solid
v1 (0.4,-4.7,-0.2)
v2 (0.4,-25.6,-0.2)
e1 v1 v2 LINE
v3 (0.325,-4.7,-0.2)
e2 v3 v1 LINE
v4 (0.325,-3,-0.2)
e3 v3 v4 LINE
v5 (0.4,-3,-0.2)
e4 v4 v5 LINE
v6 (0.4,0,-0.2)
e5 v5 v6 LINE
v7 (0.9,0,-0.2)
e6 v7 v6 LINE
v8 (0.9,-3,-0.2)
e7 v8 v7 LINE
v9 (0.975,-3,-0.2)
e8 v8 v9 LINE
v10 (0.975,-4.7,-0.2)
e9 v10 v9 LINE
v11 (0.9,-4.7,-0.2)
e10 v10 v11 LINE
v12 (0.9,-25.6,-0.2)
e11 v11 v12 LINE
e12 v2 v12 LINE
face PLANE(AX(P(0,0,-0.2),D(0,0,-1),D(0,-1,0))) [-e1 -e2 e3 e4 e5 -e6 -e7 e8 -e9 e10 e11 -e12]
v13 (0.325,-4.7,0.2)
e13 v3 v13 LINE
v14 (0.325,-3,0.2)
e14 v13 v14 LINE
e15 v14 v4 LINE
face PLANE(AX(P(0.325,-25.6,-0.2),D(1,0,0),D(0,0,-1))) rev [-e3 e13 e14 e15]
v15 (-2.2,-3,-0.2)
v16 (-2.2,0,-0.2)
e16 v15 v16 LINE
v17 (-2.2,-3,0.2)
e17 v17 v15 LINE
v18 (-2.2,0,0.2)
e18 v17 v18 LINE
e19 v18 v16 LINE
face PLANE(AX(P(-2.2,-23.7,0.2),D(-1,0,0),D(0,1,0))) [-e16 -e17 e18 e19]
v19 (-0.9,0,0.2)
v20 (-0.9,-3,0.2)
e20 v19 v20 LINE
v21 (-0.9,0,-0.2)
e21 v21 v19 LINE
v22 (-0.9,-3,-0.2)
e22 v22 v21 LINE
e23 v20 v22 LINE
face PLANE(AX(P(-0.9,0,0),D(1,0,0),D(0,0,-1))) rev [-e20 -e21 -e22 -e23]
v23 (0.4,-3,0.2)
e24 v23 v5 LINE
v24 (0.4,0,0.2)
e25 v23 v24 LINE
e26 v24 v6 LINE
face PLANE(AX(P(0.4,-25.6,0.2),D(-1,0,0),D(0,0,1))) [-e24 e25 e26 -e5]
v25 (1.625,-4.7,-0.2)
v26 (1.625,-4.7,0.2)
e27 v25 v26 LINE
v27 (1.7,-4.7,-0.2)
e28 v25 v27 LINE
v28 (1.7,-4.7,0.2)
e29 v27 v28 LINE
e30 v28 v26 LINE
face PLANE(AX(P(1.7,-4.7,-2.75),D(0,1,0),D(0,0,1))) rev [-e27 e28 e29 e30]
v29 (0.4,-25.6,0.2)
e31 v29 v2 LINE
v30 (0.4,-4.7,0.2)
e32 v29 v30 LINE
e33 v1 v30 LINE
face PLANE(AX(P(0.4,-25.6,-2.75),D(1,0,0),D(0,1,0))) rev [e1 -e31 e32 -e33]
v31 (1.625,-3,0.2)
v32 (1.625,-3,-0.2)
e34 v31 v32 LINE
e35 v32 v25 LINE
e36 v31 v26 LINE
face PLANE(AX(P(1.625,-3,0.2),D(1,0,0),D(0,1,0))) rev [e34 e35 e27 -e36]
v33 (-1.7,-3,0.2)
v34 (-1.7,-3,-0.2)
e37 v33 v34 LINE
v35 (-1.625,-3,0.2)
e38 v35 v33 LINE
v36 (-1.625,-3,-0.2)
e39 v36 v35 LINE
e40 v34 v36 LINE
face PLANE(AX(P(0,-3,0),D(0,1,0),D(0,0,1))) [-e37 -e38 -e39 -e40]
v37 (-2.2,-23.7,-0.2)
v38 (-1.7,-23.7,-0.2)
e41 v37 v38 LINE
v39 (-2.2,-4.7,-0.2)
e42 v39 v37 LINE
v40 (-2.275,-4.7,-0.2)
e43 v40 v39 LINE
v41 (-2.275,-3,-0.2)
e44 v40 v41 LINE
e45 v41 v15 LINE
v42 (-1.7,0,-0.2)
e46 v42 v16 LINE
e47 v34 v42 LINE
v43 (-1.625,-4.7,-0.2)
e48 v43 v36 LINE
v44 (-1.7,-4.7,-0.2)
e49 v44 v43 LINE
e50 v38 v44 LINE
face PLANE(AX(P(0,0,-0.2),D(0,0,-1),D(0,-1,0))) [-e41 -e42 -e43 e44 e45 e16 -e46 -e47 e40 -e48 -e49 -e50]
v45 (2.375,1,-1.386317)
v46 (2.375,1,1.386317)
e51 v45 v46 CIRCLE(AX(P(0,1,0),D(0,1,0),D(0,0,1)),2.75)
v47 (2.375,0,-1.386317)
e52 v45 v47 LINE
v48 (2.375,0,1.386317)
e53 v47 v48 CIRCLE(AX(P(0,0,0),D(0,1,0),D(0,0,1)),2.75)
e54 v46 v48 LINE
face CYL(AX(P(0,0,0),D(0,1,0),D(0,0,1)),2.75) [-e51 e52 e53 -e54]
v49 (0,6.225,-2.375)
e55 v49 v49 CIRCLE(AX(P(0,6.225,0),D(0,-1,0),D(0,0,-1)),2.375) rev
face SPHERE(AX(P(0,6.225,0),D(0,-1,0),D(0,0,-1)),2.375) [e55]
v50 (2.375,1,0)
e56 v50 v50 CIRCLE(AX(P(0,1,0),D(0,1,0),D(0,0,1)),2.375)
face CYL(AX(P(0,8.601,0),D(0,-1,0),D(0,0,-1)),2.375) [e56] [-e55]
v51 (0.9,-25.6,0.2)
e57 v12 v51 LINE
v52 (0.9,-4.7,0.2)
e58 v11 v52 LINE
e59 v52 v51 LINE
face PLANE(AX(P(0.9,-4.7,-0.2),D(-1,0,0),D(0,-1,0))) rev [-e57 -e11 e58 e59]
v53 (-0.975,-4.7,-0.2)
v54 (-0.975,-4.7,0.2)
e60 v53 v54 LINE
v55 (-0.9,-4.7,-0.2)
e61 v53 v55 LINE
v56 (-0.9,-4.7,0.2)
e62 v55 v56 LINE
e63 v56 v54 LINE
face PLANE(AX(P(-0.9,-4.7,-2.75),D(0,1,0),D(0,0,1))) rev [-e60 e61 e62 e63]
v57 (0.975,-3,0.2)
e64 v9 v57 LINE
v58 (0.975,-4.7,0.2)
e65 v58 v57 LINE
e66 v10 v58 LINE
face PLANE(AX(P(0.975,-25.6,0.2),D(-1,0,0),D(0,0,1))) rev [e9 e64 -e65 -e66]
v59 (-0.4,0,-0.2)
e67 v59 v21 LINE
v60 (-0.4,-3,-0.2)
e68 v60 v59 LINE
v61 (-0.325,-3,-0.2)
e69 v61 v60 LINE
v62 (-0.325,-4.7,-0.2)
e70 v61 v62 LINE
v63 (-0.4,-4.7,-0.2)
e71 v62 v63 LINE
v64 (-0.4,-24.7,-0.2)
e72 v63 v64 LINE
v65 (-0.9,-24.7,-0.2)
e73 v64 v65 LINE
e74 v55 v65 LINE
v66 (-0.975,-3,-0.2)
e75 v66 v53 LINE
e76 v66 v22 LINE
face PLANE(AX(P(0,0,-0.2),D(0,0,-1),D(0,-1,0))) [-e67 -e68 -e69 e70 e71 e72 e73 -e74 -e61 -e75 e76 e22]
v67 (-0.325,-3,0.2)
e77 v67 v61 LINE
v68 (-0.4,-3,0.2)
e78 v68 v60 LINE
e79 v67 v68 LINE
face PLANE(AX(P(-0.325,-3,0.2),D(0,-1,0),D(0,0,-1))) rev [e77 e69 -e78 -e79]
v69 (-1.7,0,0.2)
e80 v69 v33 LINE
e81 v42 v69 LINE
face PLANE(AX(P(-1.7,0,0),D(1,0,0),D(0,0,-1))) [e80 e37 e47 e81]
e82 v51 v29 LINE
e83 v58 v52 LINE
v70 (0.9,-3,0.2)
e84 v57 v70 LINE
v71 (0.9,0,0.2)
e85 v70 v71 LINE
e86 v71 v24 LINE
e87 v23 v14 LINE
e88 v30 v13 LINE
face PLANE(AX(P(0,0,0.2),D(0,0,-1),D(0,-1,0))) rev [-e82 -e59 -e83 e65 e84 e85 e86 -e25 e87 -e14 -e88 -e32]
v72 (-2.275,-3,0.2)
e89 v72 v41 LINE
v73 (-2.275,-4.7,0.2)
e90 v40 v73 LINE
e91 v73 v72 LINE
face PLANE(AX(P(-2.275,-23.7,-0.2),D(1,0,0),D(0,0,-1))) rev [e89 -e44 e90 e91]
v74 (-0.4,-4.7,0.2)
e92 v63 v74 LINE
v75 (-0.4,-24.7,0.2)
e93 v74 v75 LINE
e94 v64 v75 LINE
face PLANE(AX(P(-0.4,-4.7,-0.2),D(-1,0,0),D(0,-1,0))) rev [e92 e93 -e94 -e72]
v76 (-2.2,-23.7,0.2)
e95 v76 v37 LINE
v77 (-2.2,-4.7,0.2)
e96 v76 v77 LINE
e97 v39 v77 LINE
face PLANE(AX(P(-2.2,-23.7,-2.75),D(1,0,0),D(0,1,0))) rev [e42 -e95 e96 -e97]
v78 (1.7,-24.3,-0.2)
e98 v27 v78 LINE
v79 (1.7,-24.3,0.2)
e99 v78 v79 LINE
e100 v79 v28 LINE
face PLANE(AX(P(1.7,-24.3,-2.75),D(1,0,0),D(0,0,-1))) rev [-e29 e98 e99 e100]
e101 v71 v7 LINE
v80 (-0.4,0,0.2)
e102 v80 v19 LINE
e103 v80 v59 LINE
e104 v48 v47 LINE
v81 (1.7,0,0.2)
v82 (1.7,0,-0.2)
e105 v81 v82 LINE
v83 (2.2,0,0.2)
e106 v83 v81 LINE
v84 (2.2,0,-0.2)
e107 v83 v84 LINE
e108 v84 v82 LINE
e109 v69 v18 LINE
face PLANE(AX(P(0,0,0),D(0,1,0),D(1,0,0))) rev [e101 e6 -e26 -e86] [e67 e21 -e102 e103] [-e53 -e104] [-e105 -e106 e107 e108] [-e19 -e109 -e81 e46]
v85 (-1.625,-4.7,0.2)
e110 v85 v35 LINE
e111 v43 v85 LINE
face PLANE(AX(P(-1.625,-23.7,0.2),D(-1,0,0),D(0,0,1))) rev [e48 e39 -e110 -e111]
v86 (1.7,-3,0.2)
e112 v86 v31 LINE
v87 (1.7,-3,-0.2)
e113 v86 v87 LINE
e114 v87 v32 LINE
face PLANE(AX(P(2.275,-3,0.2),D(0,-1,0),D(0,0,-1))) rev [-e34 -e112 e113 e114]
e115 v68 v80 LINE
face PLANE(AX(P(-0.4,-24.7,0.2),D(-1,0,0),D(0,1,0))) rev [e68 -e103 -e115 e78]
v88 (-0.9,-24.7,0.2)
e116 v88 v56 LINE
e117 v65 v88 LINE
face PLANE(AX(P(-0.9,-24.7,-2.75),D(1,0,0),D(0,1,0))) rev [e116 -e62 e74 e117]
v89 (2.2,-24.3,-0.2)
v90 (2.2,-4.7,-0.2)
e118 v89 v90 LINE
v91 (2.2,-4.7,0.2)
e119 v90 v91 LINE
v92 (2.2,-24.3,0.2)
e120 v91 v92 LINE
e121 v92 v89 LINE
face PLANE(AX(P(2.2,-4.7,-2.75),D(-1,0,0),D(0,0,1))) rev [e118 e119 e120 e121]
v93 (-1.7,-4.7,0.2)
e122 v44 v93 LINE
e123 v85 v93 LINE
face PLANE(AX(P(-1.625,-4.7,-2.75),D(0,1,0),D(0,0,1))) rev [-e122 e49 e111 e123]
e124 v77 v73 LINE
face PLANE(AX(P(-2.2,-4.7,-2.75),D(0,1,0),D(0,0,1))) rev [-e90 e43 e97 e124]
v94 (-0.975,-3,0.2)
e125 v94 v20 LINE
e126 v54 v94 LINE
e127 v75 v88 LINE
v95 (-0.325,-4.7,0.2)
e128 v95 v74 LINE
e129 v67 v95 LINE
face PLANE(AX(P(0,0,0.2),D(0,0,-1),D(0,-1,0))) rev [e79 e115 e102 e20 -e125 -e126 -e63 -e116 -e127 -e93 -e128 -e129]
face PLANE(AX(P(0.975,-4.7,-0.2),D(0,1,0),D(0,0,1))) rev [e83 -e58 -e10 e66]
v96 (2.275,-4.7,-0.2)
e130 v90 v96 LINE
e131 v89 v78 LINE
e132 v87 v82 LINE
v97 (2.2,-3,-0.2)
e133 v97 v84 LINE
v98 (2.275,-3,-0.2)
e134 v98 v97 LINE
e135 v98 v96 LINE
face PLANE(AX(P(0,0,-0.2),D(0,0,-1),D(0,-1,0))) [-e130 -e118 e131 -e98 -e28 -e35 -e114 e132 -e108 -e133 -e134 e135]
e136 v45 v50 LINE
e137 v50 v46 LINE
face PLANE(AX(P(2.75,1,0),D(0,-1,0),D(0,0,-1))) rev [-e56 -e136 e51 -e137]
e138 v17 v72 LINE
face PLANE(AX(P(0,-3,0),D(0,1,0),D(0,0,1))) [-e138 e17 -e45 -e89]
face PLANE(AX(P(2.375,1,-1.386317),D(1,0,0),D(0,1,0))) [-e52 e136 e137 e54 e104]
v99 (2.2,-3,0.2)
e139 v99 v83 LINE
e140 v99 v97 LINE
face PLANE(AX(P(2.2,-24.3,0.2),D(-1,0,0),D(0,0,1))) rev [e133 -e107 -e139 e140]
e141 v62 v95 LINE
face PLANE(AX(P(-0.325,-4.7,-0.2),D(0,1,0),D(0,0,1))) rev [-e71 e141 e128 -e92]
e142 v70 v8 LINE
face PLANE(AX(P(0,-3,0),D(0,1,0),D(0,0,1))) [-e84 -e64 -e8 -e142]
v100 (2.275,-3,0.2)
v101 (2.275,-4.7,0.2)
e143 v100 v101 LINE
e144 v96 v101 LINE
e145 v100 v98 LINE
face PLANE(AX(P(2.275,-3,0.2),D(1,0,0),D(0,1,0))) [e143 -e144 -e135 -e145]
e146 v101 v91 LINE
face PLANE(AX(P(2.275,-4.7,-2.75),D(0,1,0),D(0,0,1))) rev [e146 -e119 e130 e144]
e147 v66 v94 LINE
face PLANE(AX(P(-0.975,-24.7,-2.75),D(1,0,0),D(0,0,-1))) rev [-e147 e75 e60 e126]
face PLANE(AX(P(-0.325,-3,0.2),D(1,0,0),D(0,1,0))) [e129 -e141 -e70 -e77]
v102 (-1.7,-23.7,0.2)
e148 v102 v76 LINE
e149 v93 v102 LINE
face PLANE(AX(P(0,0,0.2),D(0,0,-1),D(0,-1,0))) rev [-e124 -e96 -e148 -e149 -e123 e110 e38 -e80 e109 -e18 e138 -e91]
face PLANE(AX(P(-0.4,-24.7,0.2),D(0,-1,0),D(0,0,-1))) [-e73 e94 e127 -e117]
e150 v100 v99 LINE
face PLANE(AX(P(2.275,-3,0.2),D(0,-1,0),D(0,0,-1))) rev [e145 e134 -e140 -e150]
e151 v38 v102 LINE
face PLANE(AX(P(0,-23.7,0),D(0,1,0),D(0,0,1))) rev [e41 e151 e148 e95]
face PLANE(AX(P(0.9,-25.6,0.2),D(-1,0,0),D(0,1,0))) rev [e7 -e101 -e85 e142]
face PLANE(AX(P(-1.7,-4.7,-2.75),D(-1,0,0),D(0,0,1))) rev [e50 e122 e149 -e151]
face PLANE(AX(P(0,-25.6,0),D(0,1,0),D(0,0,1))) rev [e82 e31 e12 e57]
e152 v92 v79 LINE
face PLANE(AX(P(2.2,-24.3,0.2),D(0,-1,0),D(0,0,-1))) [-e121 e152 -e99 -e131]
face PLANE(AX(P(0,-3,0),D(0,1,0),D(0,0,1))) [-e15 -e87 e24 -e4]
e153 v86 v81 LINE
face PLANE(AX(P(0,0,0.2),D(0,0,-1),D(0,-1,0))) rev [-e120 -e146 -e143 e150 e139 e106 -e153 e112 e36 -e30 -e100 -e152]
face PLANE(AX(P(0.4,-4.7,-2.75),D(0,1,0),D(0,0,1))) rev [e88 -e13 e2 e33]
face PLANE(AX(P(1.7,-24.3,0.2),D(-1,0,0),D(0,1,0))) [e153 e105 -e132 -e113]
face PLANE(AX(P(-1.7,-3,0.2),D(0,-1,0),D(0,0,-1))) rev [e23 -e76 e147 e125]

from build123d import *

# Parameters (mm, degrees)
BOSS_EXTRUDE1_START         = -4
BOSS_EXTRUDE1_OUTLINE_W     = 0.5
BOSS_EXTRUDE1_OUTLINE_H     = 0.4
BOSS_EXTRUDE1_OUTLINE_W_2   = 1.8
BOSS_EXTRUDE1_DEPTH         = 25.3
BOSS_EXTRUDE1_2_OUTLINE_W   = 0.5
BOSS_EXTRUDE1_2_OUTLINE_H   = 0.4
BOSS_EXTRUDE1_2_OUTLINE_W_2 = 1.8
BOSS_EXTRUDE1_2_DEPTH       = 1
BOSS_EXTRUDE1_3_OUTLINE_W   = 0.075
BOSS_EXTRUDE1_3_OUTLINE_H   = 0.4
BOSS_EXTRUDE1_3_DEPTH       = 21.3
BOSS_EXTRUDE1_START_2       = 21.3
BOSS_EXTRUDE1_4_OUTLINE_W   = 0.65
BOSS_EXTRUDE1_4_OUTLINE_H   = 0.4
BOSS_EXTRUDE1_4_OUTLINE_W_2 = 1.875
BOSS_EXTRUDE1_4_DEPTH       = 0.4
BOSS_EXTRUDE1_START_3       = 21.7
BOSS_EXTRUDE1_5_OUTLINE_W   = 0.65
BOSS_EXTRUDE1_5_OUTLINE_H   = 0.4
BOSS_EXTRUDE1_5_DEPTH       = 0.9
SKETCH2_W                   = 1.225
SKETCH2_H                   = 21.7
CUT_EXTRUDE1_DEPTH          = 26.915728815
SKETCH6_W                   = 0.4
SKETCH6_H                   = 3
CUT_EXTRUDE2_DEPTH          = 0.8
SKETCH11_W                  = 0.65
SKETCH11_H                  = 0.4
BOSS_EXTRUDE2_DEPTH         = 20.7
SKETCH17_W                  = 0.075
SKETCH17_H                  = 20
CUT_EXTRUDE3_DEPTH          = 0.4
SKETCH18_W                  = 0.075
SKETCH18_H                  = 20
CUT_EXTRUDE4_DEPTH          = 26.915728815
SKETCH19_W                  = 0.075
SKETCH19_H                  = 19.6
CUT_EXTRUDE5_DEPTH          = 26.915728815
SKETCH20_W                  = 0.075
SKETCH20_H                  = 19.6
CUT_EXTRUDE6_DEPTH          = 26.915728815
SKETCH21_W                  = 0.075
SKETCH21_H                  = 20.9
CUT_EXTRUDE7_DEPTH          = 0.4
SKETCH22_W                  = 0.075
SKETCH22_H                  = 20.9
CUT_EXTRUDE8_DEPTH          = 26.915728815
SKETCH23_W                  = 0.075
SKETCH23_H                  = 19
CUT_EXTRUDE9_DEPTH          = 26.915728815
SKETCH24_W                  = 0.075
SKETCH24_H                  = 19
CUT_EXTRUDE10_DEPTH         = 26.915728815


with BuildPart() as part:
    # Boss-Extrude1: read off the stored shape, not the designer's step
    # Boss-Extrude1 outline → Boss-Extrude1 (new body)
    with BuildSketch(Plane.XZ.offset(3).offset(BOSS_EXTRUDE1_START)):
        with Locations((0.65, 0)):
            Rectangle(BOSS_EXTRUDE1_OUTLINE_W, BOSS_EXTRUDE1_OUTLINE_H)
        with Locations((-1.3, 0)):
            Rectangle(BOSS_EXTRUDE1_OUTLINE_W_2, BOSS_EXTRUDE1_OUTLINE_H)
        with Locations((1.95, 0)):
            Rectangle(BOSS_EXTRUDE1_OUTLINE_W, BOSS_EXTRUDE1_OUTLINE_H)
    extrude(amount=BOSS_EXTRUDE1_DEPTH)

    # Boss-Extrude1 2 outline → Boss-Extrude1 2 (add)
    with BuildSketch(Plane.XZ.offset(3).offset(BOSS_EXTRUDE1_START)):
        with BuildLine():
            ThreePointArc((2.375, 1.386317063), (-2.75, 0), (2.375, -1.386317063))
            Line((2.375, -1.386317063), (2.375, 1.386317063))
        make_face()
        with Locations((0.65, 0)):
            Rectangle(BOSS_EXTRUDE1_2_OUTLINE_W, BOSS_EXTRUDE1_2_OUTLINE_H, mode=Mode.SUBTRACT)
        with Locations((-1.3, 0)):
            Rectangle(BOSS_EXTRUDE1_2_OUTLINE_W_2, BOSS_EXTRUDE1_2_OUTLINE_H, mode=Mode.SUBTRACT)
        with Locations((1.95, 0)):
            Rectangle(BOSS_EXTRUDE1_2_OUTLINE_W, BOSS_EXTRUDE1_2_OUTLINE_H, mode=Mode.SUBTRACT)
    extrude(amount=BOSS_EXTRUDE1_2_DEPTH)

    # Boss-Extrude1 3 outline → Boss-Extrude1 3 (add)
    with BuildSketch(Plane.XZ.offset(3)):
        with Locations((0.3625, 0)):
            Rectangle(BOSS_EXTRUDE1_3_OUTLINE_W, BOSS_EXTRUDE1_3_OUTLINE_H)
        with Locations((0.9375, 0)):
            Rectangle(BOSS_EXTRUDE1_3_OUTLINE_W, BOSS_EXTRUDE1_3_OUTLINE_H)
        with Locations((-0.3625, 0)):
            Rectangle(BOSS_EXTRUDE1_3_OUTLINE_W, BOSS_EXTRUDE1_3_OUTLINE_H)
        with Locations((1.6625, 0)):
            Rectangle(BOSS_EXTRUDE1_3_OUTLINE_W, BOSS_EXTRUDE1_3_OUTLINE_H)
        with Locations((2.2375, 0)):
            Rectangle(BOSS_EXTRUDE1_3_OUTLINE_W, BOSS_EXTRUDE1_3_OUTLINE_H)
    extrude(amount=BOSS_EXTRUDE1_3_DEPTH)

    # Boss-Extrude1 4 outline → Boss-Extrude1 4 (add)
    with BuildSketch(Plane.XZ.offset(3).offset(BOSS_EXTRUDE1_START_2)):
        with Locations((0.65, 0)):
            Rectangle(BOSS_EXTRUDE1_4_OUTLINE_W, BOSS_EXTRUDE1_4_OUTLINE_H)
        with Locations((-1.2625, 0)):
            Rectangle(BOSS_EXTRUDE1_4_OUTLINE_W_2, BOSS_EXTRUDE1_4_OUTLINE_H)
    extrude(amount=BOSS_EXTRUDE1_4_DEPTH)

    # Boss-Extrude1 5 outline → Boss-Extrude1 5 (add)
    with BuildSketch(Plane.XZ.offset(3).offset(BOSS_EXTRUDE1_START_3)):
        with Locations((0.65, 0)):
            Rectangle(BOSS_EXTRUDE1_5_OUTLINE_W, BOSS_EXTRUDE1_5_OUTLINE_H)
    extrude(amount=BOSS_EXTRUDE1_5_DEPTH)

    # Sketch2 → Cut-Extrude1 (cut, through all)
    with BuildSketch(Plane.XY.offset(0.2)):
        with Locations((-1.5875, -13.85)):
            Rectangle(SKETCH2_W, SKETCH2_H)
    extrude(amount=-CUT_EXTRUDE1_DEPTH, mode=Mode.SUBTRACT)

    # Sketch6 → Cut-Extrude2 (cut)
    with BuildSketch(Plane(origin=(-0.9, 0, 0), x_dir=(0, 0, -1), z_dir=(1, 0, 0))):
        with Locations((0, -1.5)):
            Rectangle(SKETCH6_W, SKETCH6_H)
    extrude(amount=-CUT_EXTRUDE2_DEPTH, mode=Mode.SUBTRACT)

    # Sketch11 → Boss-Extrude2 (add)
    with BuildSketch(Plane(origin=(0, -3, 0), x_dir=(-1, 0, 0), z_dir=(0, -1, 0))):
        with Locations((1.95, 0)):
            Rectangle(SKETCH11_W, SKETCH11_H)
    extrude(amount=BOSS_EXTRUDE2_DEPTH)

    # Sketch17 → Cut-Extrude3 (cut)
    with BuildSketch(Plane.XY.offset(0.2)):
        with Locations((-0.3625, -14.7)):
            Rectangle(SKETCH17_W, SKETCH17_H)
    extrude(amount=-CUT_EXTRUDE3_DEPTH, mode=Mode.SUBTRACT)

    # Sketch18 → Cut-Extrude4 (cut, through all)
    with BuildSketch(Plane.XY.offset(0.2)):
        with Locations((-0.9375, -14.7)):
            Rectangle(SKETCH18_W, SKETCH18_H)
    extrude(amount=-CUT_EXTRUDE4_DEPTH, mode=Mode.SUBTRACT)

    # Sketch19 → Cut-Extrude5 (cut, through all)
    with BuildSketch(Plane.XY.offset(0.2)):
        with Locations((2.2375, -14.5)):
            Rectangle(SKETCH19_W, SKETCH19_H)
    extrude(amount=-CUT_EXTRUDE5_DEPTH, mode=Mode.SUBTRACT)

    # Sketch20 → Cut-Extrude6 (cut, through all)
    with BuildSketch(Plane.XY.offset(0.2)):
        with Locations((1.6625, -14.5)):
            Rectangle(SKETCH20_W, SKETCH20_H)
    extrude(amount=-CUT_EXTRUDE6_DEPTH, mode=Mode.SUBTRACT)

    # Sketch21 → Cut-Extrude7 (cut)
    with BuildSketch(Plane.XY.offset(0.2)):
        with Locations((0.9375, -15.15)):
            Rectangle(SKETCH21_W, SKETCH21_H)
    extrude(amount=-CUT_EXTRUDE7_DEPTH, mode=Mode.SUBTRACT)

    # Sketch22 → Cut-Extrude8 (cut, through all)
    with BuildSketch(Plane.XY.offset(0.2)):
        with Locations((0.3625, -15.15)):
            Rectangle(SKETCH22_W, SKETCH22_H)
    extrude(amount=-CUT_EXTRUDE8_DEPTH, mode=Mode.SUBTRACT)

    # Sketch23 → Cut-Extrude9 (cut, through all)
    with BuildSketch(Plane.XY.offset(0.2)):
        with Locations((-1.6625, -14.2)):
            Rectangle(SKETCH23_W, SKETCH23_H)
    extrude(amount=-CUT_EXTRUDE9_DEPTH, mode=Mode.SUBTRACT)

    # Sketch24 → Cut-Extrude10 (cut, through all)
    with BuildSketch(Plane.XY.offset(0.2)):
        with Locations((-2.2375, -14.2)):
            Rectangle(SKETCH24_W, SKETCH24_H)
    extrude(amount=-CUT_EXTRUDE10_DEPTH, mode=Mode.SUBTRACT)

    # Boss-Extrude3: read off the stored shape, not the designer's step
    # Boss-Extrude3 outline → Boss-Extrude3 (revolve)
    with BuildSketch(Plane.XY):
        with BuildLine():
            Line((2.375, 1), (2.375, 6.224999998))
            ThreePointArc((2.375, 6.224999998), (1.679378606, 7.904378604), (0, 8.6))
            Line((0, 8.6), (0, 1))
            Line((0, 1), (2.375, 1))
        make_face()
    revolve(axis=Axis((0, 0, 0), (0, 1, 0)))


solid = part.part
